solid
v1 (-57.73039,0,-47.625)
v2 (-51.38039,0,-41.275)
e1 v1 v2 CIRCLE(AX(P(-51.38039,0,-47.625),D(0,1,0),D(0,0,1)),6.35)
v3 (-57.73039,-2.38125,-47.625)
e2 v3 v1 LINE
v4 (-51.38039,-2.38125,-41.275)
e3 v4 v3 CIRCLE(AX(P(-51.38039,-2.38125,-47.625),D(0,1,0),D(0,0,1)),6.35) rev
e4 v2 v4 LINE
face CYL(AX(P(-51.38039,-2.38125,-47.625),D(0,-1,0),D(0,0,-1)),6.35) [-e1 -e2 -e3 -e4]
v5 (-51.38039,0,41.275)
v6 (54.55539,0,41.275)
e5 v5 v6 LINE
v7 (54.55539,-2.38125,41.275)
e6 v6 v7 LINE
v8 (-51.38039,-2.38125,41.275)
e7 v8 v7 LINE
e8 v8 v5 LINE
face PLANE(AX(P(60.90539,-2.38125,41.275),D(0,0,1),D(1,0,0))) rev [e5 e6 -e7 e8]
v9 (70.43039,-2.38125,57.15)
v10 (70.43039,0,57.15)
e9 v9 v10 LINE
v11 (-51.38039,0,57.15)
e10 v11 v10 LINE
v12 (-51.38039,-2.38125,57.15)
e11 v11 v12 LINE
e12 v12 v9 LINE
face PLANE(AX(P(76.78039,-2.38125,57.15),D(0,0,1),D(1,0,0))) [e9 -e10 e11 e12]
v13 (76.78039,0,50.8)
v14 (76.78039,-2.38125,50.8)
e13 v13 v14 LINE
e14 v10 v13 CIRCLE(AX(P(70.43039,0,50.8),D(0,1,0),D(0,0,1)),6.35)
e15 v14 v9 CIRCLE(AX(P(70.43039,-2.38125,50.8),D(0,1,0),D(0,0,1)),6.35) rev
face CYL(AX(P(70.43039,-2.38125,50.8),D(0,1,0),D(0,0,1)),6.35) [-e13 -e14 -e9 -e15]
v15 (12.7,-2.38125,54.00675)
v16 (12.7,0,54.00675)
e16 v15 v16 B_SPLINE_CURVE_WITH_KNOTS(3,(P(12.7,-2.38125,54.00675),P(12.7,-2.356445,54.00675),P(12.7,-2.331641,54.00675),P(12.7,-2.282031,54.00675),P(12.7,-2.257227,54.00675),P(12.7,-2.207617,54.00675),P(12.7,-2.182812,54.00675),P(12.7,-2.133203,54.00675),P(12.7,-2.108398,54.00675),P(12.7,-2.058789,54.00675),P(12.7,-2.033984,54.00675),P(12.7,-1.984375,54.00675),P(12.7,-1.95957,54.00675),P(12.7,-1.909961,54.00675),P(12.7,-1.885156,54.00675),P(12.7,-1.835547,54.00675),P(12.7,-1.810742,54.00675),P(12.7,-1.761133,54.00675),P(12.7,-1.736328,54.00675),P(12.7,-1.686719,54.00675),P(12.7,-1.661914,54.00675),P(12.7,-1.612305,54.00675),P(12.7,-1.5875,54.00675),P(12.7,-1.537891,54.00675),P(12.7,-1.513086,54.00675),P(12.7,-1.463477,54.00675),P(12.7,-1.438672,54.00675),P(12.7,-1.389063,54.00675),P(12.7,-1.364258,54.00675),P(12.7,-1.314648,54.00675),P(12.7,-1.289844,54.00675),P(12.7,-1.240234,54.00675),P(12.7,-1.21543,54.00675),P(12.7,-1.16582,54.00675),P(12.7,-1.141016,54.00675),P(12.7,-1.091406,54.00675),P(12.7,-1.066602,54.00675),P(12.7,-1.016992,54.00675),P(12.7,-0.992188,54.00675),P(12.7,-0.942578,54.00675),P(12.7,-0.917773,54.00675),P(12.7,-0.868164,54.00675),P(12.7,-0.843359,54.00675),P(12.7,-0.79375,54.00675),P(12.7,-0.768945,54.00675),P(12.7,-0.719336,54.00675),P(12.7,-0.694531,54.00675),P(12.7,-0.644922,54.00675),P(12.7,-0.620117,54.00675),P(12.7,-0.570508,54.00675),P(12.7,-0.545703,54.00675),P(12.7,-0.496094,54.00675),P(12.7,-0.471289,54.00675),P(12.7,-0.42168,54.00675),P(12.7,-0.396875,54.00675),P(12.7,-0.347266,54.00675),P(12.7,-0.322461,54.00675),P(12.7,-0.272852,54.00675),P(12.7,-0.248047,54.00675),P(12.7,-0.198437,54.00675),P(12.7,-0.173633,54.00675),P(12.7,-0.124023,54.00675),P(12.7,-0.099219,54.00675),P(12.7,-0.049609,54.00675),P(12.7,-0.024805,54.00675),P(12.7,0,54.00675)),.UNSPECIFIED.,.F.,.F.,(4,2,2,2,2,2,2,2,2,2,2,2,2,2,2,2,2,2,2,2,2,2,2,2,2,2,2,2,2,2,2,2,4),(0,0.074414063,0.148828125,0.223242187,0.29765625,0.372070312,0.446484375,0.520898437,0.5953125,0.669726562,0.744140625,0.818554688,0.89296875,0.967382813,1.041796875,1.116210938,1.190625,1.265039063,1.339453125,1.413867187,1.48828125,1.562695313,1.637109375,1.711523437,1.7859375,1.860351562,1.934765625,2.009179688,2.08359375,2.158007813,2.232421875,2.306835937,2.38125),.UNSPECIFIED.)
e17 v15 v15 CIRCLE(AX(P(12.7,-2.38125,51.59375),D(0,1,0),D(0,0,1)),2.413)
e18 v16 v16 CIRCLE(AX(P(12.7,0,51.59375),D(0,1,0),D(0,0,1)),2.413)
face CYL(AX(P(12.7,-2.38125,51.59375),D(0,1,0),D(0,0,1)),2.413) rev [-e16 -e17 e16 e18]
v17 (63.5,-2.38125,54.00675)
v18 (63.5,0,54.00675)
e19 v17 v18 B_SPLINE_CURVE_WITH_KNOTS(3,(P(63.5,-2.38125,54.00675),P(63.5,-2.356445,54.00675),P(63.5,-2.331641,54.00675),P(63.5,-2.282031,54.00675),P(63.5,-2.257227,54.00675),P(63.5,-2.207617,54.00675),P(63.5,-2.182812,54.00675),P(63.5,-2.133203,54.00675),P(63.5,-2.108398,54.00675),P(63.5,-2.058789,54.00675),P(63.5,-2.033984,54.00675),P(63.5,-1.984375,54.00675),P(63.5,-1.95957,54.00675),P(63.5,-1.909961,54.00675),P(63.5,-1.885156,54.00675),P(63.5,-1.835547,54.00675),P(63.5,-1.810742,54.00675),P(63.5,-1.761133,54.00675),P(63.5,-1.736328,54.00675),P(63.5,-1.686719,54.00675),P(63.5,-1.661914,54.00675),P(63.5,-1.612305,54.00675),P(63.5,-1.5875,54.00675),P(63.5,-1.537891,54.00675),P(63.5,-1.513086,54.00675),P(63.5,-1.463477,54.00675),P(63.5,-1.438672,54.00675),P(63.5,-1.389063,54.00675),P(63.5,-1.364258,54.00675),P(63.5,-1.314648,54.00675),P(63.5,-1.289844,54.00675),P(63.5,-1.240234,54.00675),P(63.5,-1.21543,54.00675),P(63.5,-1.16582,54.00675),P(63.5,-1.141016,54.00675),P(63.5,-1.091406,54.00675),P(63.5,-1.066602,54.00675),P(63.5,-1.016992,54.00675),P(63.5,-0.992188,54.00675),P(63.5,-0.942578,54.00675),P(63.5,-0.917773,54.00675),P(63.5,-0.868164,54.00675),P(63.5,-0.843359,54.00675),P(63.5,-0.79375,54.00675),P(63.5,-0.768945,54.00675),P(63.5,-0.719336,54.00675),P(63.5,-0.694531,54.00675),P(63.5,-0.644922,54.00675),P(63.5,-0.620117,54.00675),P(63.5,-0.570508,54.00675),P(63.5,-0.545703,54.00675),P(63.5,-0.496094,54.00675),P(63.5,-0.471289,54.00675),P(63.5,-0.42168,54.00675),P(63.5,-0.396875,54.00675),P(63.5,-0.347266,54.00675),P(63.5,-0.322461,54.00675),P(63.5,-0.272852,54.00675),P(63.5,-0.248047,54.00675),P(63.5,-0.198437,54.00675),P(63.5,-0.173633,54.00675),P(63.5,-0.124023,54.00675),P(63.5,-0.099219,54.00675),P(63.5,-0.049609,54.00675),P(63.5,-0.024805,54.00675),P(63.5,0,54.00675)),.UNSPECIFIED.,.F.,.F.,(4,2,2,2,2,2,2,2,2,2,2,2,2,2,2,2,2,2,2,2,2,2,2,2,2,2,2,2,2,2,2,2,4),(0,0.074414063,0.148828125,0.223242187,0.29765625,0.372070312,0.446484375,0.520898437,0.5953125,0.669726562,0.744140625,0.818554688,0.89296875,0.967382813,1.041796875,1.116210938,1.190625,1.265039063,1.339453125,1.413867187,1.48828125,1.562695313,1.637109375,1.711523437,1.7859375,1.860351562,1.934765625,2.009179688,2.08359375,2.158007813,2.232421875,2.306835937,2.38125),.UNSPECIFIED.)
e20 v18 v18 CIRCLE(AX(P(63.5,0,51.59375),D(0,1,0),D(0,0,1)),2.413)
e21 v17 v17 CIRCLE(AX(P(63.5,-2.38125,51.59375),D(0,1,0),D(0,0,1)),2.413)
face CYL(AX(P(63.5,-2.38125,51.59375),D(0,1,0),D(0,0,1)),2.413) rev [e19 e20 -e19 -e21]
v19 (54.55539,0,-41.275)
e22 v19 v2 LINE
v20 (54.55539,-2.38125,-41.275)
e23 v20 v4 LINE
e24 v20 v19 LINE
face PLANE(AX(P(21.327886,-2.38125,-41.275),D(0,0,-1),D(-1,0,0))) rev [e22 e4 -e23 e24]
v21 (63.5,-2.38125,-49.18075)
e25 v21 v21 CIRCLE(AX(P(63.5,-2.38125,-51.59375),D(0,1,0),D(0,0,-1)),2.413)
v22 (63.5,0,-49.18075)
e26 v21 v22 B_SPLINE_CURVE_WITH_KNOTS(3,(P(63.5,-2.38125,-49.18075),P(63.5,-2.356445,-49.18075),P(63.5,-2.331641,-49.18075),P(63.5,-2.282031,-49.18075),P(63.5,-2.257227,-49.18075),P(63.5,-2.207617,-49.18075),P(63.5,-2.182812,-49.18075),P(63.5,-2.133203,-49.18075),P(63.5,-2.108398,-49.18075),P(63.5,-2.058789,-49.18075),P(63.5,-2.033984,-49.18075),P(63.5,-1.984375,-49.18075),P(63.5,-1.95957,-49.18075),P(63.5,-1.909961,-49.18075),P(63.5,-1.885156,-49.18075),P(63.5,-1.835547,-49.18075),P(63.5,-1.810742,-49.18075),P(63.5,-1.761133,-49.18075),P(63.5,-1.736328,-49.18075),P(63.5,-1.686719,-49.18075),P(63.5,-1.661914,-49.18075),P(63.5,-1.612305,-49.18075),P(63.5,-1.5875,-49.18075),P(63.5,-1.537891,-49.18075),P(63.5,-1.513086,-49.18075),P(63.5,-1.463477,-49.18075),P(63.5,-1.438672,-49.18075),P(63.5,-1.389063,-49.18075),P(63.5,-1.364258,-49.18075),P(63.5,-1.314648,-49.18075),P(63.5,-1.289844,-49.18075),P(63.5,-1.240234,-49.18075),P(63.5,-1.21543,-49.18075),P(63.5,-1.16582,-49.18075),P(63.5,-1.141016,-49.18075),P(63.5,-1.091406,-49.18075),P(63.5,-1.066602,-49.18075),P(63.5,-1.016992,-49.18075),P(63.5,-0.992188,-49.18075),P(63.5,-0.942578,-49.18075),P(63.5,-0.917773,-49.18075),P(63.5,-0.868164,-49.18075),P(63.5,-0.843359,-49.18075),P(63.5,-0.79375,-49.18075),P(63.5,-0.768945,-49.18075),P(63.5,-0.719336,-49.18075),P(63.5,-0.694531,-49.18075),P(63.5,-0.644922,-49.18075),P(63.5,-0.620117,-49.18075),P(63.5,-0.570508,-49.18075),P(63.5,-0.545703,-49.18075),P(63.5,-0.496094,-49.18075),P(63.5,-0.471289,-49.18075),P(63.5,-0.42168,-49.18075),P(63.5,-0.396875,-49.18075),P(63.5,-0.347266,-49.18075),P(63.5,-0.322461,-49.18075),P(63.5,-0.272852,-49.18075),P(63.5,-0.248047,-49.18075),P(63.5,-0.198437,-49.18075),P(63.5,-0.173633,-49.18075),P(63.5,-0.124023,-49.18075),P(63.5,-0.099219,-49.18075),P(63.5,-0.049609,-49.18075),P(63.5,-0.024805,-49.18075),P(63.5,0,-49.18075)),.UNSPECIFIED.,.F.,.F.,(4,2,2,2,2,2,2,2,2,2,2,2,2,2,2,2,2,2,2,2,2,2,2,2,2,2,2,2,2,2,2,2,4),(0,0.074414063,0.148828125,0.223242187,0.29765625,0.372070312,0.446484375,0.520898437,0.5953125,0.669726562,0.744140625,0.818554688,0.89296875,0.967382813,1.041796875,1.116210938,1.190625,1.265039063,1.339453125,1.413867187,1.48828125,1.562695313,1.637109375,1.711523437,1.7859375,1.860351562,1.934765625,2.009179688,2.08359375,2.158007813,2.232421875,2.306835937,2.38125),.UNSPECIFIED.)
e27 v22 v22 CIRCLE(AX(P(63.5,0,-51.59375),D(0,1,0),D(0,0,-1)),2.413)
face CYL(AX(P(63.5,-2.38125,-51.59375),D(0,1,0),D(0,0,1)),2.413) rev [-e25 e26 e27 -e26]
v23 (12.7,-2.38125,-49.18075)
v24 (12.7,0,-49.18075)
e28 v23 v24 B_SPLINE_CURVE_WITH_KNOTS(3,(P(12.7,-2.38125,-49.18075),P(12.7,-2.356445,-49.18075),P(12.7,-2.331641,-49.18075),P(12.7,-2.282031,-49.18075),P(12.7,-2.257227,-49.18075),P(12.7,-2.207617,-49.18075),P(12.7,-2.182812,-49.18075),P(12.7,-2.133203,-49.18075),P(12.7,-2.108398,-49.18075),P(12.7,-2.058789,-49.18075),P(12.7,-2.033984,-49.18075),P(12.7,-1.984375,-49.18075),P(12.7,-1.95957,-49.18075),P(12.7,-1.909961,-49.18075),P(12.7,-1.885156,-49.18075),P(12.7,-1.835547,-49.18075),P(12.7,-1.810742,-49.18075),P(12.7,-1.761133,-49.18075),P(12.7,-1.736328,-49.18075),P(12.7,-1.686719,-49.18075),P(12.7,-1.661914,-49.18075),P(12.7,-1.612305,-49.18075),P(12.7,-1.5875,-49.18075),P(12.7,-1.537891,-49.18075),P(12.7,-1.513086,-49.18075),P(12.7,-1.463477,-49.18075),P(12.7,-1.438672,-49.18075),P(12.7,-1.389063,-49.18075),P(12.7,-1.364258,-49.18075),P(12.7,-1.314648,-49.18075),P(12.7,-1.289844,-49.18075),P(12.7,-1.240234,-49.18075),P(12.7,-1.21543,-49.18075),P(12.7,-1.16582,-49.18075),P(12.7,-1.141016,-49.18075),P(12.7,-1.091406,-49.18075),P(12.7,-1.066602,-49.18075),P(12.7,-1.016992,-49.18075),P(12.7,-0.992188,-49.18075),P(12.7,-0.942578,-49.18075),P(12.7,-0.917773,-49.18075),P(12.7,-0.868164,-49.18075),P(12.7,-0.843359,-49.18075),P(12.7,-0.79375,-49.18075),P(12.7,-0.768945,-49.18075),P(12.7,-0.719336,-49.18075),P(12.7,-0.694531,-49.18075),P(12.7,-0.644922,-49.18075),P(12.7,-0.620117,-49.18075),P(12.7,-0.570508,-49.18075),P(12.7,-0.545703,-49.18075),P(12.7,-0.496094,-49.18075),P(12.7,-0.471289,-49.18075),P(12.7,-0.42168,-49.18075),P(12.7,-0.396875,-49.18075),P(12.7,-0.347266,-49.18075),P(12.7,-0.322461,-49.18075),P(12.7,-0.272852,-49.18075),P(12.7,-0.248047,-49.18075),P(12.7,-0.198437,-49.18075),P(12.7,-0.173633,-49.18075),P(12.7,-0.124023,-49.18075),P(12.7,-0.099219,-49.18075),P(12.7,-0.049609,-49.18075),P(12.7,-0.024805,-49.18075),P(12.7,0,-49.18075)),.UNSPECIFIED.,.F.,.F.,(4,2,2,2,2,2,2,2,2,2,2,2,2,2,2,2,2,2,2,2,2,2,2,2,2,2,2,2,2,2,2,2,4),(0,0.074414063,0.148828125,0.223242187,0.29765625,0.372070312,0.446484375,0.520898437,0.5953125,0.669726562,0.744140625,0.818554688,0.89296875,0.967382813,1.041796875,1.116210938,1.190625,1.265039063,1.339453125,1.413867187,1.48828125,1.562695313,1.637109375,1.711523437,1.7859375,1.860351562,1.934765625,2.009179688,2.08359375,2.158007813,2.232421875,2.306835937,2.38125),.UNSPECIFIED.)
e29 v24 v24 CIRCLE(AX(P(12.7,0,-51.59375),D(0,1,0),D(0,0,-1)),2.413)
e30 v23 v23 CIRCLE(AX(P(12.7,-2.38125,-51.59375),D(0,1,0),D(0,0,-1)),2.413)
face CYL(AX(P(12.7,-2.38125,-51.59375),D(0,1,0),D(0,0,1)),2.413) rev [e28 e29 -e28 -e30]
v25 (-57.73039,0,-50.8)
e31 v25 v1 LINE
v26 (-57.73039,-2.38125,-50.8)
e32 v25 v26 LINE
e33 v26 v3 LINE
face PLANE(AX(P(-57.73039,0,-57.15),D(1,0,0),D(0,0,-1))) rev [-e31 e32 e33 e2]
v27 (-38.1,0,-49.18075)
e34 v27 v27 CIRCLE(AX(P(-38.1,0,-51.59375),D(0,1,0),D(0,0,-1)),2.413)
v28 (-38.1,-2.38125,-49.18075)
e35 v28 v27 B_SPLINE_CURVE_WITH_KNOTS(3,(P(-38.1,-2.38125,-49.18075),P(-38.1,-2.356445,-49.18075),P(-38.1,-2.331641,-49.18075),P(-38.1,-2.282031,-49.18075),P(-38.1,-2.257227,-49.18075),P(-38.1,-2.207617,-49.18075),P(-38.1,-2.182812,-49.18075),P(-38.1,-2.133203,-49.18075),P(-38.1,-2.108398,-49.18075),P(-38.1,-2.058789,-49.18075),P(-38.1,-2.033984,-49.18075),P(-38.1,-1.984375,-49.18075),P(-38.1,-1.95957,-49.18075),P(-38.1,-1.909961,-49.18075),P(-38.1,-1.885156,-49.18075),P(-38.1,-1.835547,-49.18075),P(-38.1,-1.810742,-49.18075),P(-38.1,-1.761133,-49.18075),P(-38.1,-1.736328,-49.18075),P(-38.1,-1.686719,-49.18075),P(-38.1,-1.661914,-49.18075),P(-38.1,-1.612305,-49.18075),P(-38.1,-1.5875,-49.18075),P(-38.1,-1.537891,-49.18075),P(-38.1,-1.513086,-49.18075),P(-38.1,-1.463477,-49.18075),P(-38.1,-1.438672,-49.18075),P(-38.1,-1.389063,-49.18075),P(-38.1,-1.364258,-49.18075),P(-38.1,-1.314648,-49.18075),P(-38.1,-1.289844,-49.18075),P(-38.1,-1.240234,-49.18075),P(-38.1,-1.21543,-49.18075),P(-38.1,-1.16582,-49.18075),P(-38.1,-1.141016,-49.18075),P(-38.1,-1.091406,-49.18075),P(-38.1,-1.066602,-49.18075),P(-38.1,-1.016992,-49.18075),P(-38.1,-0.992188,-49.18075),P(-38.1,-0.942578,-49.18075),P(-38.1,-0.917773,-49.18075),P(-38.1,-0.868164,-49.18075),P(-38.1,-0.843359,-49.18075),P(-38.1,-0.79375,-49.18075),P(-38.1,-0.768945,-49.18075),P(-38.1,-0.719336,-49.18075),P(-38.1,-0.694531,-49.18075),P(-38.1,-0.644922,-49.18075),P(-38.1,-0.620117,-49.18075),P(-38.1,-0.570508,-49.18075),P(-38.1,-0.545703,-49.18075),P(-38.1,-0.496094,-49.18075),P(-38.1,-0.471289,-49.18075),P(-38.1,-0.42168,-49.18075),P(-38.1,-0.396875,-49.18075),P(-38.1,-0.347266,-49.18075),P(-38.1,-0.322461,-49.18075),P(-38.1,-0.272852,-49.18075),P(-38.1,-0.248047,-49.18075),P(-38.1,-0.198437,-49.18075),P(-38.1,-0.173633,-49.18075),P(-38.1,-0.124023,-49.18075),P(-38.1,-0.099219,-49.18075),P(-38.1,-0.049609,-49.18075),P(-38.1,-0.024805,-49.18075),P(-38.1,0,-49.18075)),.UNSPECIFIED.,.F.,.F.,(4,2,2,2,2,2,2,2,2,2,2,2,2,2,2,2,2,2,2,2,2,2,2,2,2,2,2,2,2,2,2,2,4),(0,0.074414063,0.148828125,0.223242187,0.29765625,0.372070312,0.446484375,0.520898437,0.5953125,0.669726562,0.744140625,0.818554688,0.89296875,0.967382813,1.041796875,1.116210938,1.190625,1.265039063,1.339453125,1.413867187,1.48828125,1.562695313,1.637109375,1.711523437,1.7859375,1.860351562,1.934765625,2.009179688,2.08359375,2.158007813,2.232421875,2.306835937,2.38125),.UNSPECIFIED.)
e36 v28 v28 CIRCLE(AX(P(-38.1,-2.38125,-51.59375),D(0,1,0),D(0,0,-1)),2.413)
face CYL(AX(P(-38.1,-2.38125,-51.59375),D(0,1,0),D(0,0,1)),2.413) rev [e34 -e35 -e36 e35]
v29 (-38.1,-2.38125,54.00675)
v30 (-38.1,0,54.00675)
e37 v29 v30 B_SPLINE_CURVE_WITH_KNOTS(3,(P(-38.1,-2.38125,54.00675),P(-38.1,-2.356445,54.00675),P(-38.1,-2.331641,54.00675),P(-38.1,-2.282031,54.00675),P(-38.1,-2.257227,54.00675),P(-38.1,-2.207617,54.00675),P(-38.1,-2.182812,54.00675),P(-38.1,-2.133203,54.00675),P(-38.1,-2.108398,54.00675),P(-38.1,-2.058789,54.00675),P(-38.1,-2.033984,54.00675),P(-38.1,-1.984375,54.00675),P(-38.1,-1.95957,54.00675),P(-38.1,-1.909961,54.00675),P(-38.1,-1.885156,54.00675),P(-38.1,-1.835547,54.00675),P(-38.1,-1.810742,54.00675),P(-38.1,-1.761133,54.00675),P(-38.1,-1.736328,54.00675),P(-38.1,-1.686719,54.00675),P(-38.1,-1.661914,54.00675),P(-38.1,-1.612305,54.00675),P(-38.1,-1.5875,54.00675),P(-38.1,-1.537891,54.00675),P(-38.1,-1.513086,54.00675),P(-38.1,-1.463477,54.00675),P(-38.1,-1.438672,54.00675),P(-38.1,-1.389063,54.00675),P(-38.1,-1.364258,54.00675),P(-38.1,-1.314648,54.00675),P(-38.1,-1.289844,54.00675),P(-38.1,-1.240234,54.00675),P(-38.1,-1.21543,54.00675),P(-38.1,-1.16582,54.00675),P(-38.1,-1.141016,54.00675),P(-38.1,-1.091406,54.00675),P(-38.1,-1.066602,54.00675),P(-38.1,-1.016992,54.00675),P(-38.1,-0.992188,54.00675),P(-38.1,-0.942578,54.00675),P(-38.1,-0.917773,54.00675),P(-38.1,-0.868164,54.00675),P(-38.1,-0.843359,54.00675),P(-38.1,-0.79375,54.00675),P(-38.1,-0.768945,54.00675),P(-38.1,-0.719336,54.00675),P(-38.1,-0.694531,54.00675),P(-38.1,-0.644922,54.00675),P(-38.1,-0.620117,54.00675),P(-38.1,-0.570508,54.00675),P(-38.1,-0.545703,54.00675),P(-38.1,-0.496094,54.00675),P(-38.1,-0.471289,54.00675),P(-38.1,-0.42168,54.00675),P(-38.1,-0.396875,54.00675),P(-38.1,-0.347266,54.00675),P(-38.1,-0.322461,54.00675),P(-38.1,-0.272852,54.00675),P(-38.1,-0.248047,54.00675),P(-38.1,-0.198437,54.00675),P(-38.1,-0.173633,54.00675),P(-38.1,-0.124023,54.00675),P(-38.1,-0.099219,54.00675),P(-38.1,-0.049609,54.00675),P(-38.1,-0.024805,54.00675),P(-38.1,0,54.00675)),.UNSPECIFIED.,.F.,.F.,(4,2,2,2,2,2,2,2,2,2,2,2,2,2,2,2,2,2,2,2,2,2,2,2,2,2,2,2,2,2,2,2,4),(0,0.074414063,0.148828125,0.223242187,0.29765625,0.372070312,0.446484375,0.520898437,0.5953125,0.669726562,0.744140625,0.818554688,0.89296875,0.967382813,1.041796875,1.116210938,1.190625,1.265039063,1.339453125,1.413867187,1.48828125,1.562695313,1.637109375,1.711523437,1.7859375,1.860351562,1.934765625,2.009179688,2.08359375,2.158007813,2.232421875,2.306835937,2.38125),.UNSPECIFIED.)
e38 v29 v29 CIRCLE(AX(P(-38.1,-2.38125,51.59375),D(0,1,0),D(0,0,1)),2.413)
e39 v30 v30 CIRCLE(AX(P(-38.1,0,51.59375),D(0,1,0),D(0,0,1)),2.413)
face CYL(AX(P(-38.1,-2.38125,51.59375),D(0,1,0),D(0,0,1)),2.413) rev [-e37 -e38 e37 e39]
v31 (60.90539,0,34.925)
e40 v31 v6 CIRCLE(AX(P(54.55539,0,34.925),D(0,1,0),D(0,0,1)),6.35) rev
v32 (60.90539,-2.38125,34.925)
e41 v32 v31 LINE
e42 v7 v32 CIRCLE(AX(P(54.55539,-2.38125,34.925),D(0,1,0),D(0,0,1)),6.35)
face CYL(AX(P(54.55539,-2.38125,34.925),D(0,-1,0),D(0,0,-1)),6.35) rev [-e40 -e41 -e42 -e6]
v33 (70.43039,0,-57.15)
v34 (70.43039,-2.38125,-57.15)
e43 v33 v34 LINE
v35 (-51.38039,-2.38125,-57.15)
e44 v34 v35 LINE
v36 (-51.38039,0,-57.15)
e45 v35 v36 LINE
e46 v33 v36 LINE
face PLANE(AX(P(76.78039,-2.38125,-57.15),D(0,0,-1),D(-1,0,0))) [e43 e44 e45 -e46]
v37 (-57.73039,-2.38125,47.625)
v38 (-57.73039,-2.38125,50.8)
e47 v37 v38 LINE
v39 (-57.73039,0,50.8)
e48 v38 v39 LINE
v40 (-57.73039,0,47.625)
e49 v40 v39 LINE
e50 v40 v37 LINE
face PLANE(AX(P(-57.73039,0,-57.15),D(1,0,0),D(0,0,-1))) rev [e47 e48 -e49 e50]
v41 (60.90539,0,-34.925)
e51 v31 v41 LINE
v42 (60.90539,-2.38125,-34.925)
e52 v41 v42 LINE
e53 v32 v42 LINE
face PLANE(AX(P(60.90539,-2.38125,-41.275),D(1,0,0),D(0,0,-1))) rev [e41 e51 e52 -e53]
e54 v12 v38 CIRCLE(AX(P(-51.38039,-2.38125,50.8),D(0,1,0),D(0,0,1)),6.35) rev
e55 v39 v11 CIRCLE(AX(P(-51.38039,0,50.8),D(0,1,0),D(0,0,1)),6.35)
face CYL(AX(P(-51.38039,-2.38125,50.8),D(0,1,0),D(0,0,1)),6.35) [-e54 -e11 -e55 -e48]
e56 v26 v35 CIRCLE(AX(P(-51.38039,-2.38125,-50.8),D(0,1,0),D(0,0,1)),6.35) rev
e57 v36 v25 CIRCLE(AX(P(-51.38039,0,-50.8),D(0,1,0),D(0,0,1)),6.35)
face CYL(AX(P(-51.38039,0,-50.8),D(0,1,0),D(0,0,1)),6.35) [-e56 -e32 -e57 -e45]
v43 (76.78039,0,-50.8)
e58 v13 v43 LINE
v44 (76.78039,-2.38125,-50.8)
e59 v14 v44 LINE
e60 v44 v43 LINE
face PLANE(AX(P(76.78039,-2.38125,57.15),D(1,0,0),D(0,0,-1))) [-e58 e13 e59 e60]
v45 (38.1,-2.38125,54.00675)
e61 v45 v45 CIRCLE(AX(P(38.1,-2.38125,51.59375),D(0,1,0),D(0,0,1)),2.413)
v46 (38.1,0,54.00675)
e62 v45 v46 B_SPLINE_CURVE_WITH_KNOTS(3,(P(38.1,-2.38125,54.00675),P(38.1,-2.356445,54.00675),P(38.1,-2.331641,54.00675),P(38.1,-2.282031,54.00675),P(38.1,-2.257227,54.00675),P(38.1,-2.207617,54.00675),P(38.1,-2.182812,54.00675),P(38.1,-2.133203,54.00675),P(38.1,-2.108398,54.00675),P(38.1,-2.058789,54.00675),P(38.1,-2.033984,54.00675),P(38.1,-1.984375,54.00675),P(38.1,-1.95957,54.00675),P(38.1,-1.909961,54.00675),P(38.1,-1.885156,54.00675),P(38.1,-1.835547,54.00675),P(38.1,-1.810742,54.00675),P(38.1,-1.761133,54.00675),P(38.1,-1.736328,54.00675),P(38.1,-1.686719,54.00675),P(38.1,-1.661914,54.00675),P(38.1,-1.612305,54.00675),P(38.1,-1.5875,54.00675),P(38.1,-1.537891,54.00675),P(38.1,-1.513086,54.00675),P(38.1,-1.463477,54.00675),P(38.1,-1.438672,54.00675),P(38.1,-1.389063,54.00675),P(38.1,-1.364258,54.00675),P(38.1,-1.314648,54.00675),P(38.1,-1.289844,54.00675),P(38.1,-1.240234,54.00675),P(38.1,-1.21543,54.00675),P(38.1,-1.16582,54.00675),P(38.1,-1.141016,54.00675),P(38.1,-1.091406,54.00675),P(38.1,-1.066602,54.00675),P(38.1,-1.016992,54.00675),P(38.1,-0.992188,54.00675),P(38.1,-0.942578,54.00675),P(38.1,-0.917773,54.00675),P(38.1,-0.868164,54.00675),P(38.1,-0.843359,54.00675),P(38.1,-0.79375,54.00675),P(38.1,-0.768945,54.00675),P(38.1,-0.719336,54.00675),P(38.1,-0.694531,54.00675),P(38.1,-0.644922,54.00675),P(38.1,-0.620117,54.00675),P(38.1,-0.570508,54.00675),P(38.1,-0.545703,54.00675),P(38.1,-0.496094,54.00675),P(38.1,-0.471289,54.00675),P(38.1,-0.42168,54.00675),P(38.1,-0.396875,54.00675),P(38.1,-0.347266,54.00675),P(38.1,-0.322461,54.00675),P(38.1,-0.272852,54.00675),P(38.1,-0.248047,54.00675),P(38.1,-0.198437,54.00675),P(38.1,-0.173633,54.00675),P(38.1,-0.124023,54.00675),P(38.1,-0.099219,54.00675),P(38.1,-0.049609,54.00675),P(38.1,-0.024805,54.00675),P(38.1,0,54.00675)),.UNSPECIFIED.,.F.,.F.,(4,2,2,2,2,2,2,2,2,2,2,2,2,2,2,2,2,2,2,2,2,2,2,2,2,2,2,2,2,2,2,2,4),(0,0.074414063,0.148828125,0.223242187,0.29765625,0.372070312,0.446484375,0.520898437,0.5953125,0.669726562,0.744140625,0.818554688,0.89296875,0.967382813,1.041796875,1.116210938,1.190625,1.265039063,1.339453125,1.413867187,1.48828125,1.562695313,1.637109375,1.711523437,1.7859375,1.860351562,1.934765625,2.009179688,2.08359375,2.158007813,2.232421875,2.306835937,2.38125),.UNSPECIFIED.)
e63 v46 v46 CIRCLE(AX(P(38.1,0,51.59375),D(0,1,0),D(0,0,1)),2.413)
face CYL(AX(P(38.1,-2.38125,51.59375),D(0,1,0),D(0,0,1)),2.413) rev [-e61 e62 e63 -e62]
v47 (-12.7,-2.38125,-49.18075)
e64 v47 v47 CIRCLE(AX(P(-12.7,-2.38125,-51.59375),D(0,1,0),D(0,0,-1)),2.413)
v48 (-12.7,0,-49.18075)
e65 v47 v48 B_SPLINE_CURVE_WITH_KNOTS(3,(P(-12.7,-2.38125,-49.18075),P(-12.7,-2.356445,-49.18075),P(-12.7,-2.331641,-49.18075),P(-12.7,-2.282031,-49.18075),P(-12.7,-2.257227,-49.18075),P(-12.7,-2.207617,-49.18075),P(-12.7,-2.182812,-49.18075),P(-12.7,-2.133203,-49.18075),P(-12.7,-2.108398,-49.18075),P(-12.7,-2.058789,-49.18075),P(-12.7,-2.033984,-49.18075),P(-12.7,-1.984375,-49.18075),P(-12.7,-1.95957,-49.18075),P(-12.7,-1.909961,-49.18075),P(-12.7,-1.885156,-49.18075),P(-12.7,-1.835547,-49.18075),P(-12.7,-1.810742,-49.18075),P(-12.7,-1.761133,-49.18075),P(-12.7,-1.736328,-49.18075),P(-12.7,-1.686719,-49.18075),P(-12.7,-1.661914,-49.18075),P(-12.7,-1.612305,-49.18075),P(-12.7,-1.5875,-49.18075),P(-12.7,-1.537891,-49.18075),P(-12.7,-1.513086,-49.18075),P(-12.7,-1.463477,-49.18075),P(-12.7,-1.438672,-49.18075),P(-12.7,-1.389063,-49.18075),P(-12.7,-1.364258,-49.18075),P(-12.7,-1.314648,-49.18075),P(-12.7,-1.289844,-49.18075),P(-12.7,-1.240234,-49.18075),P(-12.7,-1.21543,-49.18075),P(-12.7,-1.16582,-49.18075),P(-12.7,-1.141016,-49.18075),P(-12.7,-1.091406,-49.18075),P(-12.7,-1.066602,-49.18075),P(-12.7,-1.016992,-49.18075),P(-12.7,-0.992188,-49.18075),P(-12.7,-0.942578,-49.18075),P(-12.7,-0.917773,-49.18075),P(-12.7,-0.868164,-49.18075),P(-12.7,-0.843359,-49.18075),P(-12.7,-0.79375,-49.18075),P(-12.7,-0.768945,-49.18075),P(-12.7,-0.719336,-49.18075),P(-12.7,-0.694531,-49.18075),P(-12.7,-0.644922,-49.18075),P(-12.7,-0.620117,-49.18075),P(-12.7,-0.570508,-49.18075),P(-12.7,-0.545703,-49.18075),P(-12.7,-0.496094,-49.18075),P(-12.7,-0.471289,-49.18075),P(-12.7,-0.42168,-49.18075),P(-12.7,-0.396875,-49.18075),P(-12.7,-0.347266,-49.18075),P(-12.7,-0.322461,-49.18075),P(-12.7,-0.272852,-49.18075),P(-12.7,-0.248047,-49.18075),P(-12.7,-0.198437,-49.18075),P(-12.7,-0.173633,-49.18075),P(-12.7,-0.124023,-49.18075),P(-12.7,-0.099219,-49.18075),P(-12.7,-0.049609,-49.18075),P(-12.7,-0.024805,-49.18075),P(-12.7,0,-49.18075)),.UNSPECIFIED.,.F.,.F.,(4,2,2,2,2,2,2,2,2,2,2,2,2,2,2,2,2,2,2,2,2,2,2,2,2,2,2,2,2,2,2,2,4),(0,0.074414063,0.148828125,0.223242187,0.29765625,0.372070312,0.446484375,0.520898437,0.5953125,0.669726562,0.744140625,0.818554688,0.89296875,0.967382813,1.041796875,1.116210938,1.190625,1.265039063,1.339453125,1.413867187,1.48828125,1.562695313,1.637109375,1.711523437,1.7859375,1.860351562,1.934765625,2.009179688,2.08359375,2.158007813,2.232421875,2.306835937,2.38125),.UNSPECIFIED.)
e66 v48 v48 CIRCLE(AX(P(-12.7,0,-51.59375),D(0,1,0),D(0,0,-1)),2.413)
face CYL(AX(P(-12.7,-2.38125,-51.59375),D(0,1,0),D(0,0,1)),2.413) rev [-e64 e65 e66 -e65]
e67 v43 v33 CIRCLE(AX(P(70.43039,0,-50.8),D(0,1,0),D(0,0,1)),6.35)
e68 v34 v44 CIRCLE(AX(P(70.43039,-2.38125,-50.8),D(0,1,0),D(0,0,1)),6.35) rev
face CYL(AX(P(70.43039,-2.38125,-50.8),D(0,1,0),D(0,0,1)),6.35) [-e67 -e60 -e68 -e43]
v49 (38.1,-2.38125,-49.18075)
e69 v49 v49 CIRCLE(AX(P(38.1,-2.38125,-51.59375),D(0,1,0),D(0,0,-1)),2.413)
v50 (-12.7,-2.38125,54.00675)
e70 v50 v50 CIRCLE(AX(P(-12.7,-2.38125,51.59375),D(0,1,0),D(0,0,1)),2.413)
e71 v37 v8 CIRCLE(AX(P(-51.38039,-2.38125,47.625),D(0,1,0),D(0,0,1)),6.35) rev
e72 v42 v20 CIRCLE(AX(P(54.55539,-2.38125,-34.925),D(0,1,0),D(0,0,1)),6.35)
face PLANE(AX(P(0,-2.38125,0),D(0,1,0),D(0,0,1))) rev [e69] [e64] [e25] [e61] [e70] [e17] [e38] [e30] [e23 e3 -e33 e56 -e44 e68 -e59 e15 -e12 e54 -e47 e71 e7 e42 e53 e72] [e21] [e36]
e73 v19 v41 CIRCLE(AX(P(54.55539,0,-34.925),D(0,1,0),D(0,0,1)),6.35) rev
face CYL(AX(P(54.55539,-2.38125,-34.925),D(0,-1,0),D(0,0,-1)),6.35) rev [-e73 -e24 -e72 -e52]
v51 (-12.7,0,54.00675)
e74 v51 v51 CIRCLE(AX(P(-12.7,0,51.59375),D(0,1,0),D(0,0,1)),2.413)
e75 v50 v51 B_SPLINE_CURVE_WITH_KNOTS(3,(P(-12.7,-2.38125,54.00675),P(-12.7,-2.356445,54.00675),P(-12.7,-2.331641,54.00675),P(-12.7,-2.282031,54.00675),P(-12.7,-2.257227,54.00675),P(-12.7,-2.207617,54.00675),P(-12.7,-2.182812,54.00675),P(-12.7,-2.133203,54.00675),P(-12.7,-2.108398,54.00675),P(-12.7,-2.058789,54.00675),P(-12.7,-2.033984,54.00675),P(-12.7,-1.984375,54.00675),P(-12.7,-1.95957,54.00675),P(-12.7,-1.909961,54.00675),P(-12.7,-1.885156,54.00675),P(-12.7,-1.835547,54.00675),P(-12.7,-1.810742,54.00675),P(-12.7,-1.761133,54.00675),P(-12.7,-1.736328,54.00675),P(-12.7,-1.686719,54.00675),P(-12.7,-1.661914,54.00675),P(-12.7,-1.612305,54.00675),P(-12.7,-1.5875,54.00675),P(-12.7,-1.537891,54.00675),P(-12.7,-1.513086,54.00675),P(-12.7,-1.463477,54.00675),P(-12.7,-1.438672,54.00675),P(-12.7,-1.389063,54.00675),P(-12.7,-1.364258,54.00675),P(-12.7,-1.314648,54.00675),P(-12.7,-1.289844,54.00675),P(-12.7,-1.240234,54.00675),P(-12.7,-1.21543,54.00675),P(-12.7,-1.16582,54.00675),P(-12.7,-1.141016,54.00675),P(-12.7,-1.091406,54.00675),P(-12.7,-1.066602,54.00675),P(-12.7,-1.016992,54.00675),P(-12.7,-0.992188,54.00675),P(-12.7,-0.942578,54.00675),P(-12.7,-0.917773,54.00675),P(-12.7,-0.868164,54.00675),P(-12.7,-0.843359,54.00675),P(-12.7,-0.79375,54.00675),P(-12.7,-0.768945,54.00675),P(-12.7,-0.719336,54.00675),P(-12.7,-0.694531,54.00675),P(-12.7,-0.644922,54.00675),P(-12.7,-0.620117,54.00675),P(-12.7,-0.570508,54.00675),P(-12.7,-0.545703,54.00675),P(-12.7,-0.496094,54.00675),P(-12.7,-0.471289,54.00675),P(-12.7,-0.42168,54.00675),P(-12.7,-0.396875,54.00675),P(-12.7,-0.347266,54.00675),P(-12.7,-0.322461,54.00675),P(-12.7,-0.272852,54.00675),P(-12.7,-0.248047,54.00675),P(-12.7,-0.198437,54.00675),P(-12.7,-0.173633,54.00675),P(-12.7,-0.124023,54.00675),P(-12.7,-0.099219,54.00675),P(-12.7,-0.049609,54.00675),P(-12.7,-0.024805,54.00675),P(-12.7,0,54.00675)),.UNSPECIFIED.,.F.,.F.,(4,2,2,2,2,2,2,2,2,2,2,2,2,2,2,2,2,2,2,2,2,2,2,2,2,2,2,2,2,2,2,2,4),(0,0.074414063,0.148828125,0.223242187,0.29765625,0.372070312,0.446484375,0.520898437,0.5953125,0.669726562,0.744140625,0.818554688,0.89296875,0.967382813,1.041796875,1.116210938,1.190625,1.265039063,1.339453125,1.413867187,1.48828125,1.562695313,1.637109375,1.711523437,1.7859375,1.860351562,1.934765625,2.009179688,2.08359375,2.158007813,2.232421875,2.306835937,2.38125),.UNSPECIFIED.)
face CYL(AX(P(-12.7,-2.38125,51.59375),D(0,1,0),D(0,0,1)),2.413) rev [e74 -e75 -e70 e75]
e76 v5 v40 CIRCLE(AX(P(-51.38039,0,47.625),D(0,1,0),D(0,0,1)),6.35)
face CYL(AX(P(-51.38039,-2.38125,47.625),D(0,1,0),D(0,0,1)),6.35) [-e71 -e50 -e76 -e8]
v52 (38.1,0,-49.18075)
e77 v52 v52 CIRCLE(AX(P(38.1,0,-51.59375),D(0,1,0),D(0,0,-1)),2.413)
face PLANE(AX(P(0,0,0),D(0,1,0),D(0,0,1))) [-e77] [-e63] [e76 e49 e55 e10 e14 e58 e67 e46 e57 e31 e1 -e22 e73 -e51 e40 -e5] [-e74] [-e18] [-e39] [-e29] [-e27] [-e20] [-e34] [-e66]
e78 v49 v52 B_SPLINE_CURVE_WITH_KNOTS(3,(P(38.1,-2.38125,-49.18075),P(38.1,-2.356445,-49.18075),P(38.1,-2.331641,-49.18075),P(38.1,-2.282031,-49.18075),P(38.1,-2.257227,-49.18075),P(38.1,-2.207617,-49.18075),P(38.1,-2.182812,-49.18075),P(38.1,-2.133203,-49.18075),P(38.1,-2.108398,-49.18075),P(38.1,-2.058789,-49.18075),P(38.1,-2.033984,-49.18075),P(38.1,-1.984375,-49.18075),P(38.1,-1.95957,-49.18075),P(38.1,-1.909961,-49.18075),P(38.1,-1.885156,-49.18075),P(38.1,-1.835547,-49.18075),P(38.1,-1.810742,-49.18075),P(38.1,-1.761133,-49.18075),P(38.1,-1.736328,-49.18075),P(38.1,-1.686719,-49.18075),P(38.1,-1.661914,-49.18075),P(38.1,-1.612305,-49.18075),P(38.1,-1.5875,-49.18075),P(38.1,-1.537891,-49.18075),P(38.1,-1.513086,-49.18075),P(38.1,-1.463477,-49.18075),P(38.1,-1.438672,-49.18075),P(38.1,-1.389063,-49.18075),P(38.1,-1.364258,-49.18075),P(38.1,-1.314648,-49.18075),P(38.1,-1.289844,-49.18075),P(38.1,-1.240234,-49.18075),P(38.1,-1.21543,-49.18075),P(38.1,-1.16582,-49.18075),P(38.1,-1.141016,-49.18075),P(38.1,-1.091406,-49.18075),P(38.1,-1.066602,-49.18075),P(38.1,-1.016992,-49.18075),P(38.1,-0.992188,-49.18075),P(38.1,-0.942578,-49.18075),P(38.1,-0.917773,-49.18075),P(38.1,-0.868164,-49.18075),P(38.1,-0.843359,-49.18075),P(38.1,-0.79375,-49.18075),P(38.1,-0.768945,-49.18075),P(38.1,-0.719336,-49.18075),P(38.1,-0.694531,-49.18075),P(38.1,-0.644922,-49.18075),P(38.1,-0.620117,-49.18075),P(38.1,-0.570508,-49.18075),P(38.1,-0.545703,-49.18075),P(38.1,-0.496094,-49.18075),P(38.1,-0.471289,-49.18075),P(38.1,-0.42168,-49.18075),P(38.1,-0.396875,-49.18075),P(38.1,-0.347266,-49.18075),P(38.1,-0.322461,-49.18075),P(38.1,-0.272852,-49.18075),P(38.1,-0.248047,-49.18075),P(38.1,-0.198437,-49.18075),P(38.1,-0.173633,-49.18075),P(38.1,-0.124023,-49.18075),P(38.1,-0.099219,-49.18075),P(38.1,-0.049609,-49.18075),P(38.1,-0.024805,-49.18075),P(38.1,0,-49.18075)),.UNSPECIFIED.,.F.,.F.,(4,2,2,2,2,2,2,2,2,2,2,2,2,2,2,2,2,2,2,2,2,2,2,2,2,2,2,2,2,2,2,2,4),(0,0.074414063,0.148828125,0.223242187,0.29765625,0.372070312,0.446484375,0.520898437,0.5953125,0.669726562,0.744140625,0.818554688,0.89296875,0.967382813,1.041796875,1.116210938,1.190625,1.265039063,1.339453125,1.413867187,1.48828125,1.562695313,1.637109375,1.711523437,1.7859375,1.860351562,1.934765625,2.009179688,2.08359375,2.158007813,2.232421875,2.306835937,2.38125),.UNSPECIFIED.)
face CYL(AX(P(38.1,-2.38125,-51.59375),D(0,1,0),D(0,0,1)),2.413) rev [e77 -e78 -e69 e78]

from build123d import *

# Parameters (mm, degrees)
SKETCH1_W          = 153.56078
SKETCH1_H          = 114.3
SKETCH1_R          = 2.413
BASE_FLANGE1_DEPTH = 2.38125
FILLET1_R          = 6.35
SKETCH7_W          = 19.05
SKETCH7_H          = 114.3
CUT_EXTRUDE2_DEPTH = 2.54
FILLET2_R          = 6.35
FILLET3_R          = 6.35


# Sheet-metal steps are written as plain solids
with BuildPart() as part:
    # Sketch1 → Base-Flange1 (new body)
    with BuildSketch(Plane(origin=(0, 0, 0), x_dir=(1, 0, 0), z_dir=(0, 1, 0))):
        Rectangle(SKETCH1_W, SKETCH1_H)
        with Locations(Location((-63.5, -51.59375, 0), (0, 0, 270))):
            Circle(SKETCH1_R, mode=Mode.SUBTRACT)
        with Locations(Location((-38.1, -51.59375, 0), (0, 0, 270))):
            Circle(SKETCH1_R, mode=Mode.SUBTRACT)
        with Locations(Location((-12.7, -51.59375, 0), (0, 0, 270))):
            Circle(SKETCH1_R, mode=Mode.SUBTRACT)
        with Locations(Location((12.7, -51.59375, 0), (0, 0, 270))):
            Circle(SKETCH1_R, mode=Mode.SUBTRACT)
        with Locations(Location((38.1, -51.59375, 0), (0, 0, 270))):
            Circle(SKETCH1_R, mode=Mode.SUBTRACT)
        with Locations(Location((63.5, -51.59375, 0), (0, 0, 270))):
            Circle(SKETCH1_R, mode=Mode.SUBTRACT)
        with Locations(Location((63.5, 51.59375, 0), (0, 0, 270))):
            Circle(SKETCH1_R, mode=Mode.SUBTRACT)
        with Locations(Location((38.1, 51.59375, 0), (0, 0, 270))):
            Circle(SKETCH1_R, mode=Mode.SUBTRACT)
        with Locations(Location((12.7, 51.59375, 0), (0, 0, 270))):
            Circle(SKETCH1_R, mode=Mode.SUBTRACT)
        with Locations(Location((-12.7, 51.59375, 0), (0, 0, 270))):
            Circle(SKETCH1_R, mode=Mode.SUBTRACT)
        with Locations(Location((-38.1, 51.59375, 0), (0, 0, 270))):
            Circle(SKETCH1_R, mode=Mode.SUBTRACT)
        with Locations(Location((-63.5, 51.59375, 0), (0, 0, 270))):
            Circle(SKETCH1_R, mode=Mode.SUBTRACT)
        Polygon((60.90539, -41.275), (-63.104482091, -41.275), (-63.104482091, 41.275), (21.327886111, 41.275), (60.90539, 41.275), (60.90539, 15.875), align=None, mode=Mode.SUBTRACT)
    extrude(amount=-BASE_FLANGE1_DEPTH)

    # Fillet1
    fillet1_edges = [part.edges().sort_by_distance(p)[0] for p in [
        (-76.78039, -1.190625, -57.15),
        (76.78039, -1.190625, -57.15),
        (76.78039, -1.190625, 57.15),
        (-76.78039, -1.190625, 57.15),
    ]]
    fillet(fillet1_edges, radius=FILLET1_R)

    # Sketch7 → Cut-Extrude2 (cut)
    with BuildSketch(Plane(origin=(0, -2.38125, 0), x_dir=(-1, 0, 0), z_dir=(0, -1, 0))):
        with Locations((67.25539, 0)):
            Rectangle(SKETCH7_W, SKETCH7_H)
    extrude(amount=-CUT_EXTRUDE2_DEPTH, mode=Mode.SUBTRACT)

    # Fillet2
    fillet2_edges = [part.edges().sort_by_distance(p)[0] for p in [
        (-57.73039, -1.190625, 41.275),
        (-57.73039, -1.190625, -41.275),
        (-57.73039, -1.190625, 57.15),
        (-57.73039, -1.190625, -57.15),
    ]]
    fillet(fillet2_edges, radius=FILLET2_R)

    # Fillet3
    fillet3_edges = [part.edges().sort_by_distance(p)[0] for p in [
        (60.90539, -1.190625, -41.275),
        (60.90539, -1.190625, 41.275),
    ]]
    fillet(fillet3_edges, radius=FILLET3_R)


solid = part.part
